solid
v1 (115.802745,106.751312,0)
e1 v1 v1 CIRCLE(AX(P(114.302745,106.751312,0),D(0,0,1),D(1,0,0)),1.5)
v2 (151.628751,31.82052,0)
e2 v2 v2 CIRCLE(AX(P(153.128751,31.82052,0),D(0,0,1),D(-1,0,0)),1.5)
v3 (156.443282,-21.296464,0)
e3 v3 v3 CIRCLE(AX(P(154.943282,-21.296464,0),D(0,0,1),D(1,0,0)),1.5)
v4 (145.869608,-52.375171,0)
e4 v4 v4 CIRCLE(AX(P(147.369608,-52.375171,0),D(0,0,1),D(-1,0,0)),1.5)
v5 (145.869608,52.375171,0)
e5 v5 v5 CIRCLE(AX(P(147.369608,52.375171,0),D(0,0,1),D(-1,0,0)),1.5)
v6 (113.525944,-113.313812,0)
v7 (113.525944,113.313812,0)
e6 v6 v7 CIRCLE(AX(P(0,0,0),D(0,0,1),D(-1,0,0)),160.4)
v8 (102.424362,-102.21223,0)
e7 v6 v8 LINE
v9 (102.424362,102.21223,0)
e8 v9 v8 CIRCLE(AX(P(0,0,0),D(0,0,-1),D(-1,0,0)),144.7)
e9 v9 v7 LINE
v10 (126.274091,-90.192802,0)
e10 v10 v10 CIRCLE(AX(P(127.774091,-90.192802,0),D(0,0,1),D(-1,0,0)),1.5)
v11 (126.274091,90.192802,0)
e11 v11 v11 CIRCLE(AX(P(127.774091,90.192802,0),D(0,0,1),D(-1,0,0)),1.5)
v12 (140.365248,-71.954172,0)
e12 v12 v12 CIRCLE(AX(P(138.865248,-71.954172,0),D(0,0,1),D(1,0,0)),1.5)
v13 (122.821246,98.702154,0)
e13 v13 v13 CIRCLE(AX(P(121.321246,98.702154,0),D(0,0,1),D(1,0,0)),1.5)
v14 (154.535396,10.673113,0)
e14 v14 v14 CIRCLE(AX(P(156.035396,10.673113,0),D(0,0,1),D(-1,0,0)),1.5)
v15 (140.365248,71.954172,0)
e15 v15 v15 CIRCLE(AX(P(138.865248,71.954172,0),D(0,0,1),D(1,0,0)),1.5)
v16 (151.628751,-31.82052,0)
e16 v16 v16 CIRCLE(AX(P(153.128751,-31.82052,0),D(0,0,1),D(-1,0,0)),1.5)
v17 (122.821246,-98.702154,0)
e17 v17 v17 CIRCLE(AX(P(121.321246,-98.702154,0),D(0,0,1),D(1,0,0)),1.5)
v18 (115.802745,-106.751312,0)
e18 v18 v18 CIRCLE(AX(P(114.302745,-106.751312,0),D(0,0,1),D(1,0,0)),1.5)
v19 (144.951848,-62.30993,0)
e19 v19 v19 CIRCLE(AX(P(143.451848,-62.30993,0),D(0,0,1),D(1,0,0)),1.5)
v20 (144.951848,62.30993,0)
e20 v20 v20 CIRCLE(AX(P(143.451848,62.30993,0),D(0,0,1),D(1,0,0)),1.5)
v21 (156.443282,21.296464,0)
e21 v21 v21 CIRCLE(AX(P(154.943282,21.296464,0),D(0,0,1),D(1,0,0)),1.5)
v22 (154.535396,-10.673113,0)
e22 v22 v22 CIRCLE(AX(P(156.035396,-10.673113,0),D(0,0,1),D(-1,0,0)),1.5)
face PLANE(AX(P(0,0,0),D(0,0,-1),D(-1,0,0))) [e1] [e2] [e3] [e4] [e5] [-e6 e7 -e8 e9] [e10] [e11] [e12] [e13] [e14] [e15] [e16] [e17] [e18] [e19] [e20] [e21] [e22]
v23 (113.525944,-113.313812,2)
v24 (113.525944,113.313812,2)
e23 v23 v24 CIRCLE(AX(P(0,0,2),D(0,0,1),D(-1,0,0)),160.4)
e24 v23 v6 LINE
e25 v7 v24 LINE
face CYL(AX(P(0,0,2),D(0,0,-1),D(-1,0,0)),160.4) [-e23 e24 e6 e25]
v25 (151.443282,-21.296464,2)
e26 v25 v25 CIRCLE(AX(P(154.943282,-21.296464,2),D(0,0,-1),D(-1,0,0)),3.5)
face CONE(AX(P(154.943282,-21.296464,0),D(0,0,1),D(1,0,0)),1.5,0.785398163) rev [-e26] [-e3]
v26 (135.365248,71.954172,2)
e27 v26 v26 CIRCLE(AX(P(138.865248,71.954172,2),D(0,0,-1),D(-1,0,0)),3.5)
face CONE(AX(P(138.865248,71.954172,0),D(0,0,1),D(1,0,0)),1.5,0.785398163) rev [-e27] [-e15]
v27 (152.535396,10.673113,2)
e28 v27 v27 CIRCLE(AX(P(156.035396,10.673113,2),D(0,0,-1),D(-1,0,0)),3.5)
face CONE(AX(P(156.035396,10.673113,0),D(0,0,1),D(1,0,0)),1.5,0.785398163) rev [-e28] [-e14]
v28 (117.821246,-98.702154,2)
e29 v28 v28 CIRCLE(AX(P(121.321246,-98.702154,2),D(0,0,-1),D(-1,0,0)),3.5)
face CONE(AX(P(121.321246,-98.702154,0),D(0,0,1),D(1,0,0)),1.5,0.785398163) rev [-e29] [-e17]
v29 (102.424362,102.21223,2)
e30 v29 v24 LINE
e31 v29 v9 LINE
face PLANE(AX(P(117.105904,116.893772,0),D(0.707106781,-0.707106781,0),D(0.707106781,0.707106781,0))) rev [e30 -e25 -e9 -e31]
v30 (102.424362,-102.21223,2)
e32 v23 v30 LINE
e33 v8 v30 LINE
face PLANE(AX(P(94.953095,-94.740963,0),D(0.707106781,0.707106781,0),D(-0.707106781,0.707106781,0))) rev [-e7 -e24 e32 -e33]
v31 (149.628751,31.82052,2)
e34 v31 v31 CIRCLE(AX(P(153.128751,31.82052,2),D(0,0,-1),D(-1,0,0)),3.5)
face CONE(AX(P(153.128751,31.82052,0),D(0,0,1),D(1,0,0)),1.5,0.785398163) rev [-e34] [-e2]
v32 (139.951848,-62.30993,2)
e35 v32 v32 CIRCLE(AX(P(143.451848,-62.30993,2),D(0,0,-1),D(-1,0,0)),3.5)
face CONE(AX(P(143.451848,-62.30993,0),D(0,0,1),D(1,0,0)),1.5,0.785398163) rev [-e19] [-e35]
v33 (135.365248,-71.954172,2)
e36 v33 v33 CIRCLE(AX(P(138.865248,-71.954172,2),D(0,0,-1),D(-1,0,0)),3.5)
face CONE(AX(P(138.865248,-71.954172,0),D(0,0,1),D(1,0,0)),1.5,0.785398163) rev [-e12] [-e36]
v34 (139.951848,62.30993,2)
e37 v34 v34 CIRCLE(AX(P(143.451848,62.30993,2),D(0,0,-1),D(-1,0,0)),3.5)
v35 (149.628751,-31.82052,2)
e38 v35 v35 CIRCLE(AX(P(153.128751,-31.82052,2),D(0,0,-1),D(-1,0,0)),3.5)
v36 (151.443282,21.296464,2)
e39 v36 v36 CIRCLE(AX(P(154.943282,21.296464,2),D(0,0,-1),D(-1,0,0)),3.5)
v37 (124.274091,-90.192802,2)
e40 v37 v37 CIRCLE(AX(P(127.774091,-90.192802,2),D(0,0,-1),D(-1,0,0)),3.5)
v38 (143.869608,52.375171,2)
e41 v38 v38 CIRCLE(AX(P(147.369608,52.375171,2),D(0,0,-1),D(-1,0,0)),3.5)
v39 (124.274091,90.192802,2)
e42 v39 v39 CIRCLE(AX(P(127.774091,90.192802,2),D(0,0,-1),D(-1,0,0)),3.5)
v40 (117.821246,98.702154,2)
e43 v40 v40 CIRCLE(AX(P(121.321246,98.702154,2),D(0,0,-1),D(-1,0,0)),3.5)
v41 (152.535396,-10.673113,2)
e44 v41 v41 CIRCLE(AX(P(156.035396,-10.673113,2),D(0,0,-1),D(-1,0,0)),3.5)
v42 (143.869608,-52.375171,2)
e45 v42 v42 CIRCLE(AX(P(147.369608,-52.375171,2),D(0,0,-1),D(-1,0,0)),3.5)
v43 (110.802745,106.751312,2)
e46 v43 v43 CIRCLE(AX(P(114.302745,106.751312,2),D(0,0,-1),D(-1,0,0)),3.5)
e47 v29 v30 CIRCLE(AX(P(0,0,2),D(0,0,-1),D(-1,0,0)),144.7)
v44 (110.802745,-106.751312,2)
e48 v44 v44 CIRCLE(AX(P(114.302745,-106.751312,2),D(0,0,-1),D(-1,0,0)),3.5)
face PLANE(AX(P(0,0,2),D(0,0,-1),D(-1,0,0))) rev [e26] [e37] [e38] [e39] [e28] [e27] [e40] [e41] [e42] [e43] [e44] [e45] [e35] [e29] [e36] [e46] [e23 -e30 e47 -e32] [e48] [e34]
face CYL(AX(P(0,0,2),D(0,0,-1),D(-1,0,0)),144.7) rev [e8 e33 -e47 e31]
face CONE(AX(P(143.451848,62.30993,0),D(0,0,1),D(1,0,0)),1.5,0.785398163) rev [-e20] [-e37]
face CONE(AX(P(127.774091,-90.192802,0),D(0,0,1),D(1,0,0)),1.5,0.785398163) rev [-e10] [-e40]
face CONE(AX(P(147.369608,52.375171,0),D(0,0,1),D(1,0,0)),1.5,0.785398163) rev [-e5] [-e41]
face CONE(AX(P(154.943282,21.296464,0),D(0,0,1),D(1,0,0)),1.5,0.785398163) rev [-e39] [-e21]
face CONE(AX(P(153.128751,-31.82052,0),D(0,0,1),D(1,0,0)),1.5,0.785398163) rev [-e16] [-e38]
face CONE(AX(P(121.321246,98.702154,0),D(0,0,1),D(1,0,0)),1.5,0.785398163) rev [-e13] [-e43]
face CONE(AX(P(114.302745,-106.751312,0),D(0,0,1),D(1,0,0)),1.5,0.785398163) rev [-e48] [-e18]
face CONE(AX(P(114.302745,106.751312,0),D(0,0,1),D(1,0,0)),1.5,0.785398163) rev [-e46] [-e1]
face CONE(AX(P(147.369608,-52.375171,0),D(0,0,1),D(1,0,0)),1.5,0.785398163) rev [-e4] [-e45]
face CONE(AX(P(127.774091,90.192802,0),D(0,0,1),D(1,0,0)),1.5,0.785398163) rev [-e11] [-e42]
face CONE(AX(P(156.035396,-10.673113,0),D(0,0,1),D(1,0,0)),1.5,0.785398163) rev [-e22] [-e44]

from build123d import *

# Parameters (mm, degrees)
SKETCH1_R           = 1.5
BOSS_EXTRUDE1_DEPTH = 2
CUT_EXTRUDE1_DEPTH  = 197.459257863
CHAMFER1_SIZE       = 2


with BuildPart() as part:
    # Sketch1 → Boss-Extrude1 (new body)
    with BuildSketch(Plane.XY):
        with BuildLine():
            Line((102.318351238, 102.318351238), (113.419927702, 113.419927702))
            ThreePointArc((113.419927702, 113.419927702), (160.4, 0), (113.419927702, -113.419927702))
            Line((113.419927702, -113.419927702), (102.318351238, -102.318351238))
            ThreePointArc((102.318351238, -102.318351238), (144.7, 0), (102.318351238, 102.318351238))
        make_face()
        with Locations((121.321245866, 98.702154493)):
            Circle(SKETCH1_R, mode=Mode.SUBTRACT)
        with Locations((143.451847555, 62.309930452)):
            Circle(SKETCH1_R, mode=Mode.SUBTRACT)
        with Locations((154.94328196, 21.296463919)):
            Circle(SKETCH1_R, mode=Mode.SUBTRACT)
        with Locations((154.94328196, -21.296463919)):
            Circle(SKETCH1_R, mode=Mode.SUBTRACT)
        with Locations((143.451847555, -62.309930452)):
            Circle(SKETCH1_R, mode=Mode.SUBTRACT)
        with Locations((121.321245866, -98.702154493)):
            Circle(SKETCH1_R, mode=Mode.SUBTRACT)
        with Locations(Location((127.774091267, 90.192802379, 0), (0, 0, 180))):
            Circle(SKETCH1_R, mode=Mode.SUBTRACT)
        with Locations(Location((147.369608219, 52.375171344, 0), (0, 0, 180))):
            Circle(SKETCH1_R, mode=Mode.SUBTRACT)
        with Locations(Location((153.128751314, 31.820520441, 0), (0, 0, 180))):
            Circle(SKETCH1_R, mode=Mode.SUBTRACT)
        with Locations(Location((156.035395501, 10.67311345, 0), (0, 0, 180))):
            Circle(SKETCH1_R, mode=Mode.SUBTRACT)
        with Locations(Location((127.774091267, -90.192802379, 0), (0, 0, 180))):
            Circle(SKETCH1_R, mode=Mode.SUBTRACT)
        with Locations(Location((147.369608219, -52.375171344, 0), (0, 0, 180))):
            Circle(SKETCH1_R, mode=Mode.SUBTRACT)
        with Locations(Location((153.128751314, -31.820520441, 0), (0, 0, 180))):
            Circle(SKETCH1_R, mode=Mode.SUBTRACT)
        with Locations(Location((156.035395501, -10.67311345, 0), (0, 0, 180))):
            Circle(SKETCH1_R, mode=Mode.SUBTRACT)
        with Locations((138.865248158, 71.954171901)):
            Circle(SKETCH1_R, mode=Mode.SUBTRACT)
        with Locations((114.302744813, 106.751311599)):
            Circle(SKETCH1_R, mode=Mode.SUBTRACT)
        with Locations((138.865248158, -71.954171901)):
            Circle(SKETCH1_R, mode=Mode.SUBTRACT)
        with Locations((114.302744813, -106.751311599)):
            Circle(SKETCH1_R, mode=Mode.SUBTRACT)
    extrude(amount=BOSS_EXTRUDE1_DEPTH)

    # Sketch2 → Cut-Extrude1 (cut, through all)
    with BuildSketch(Plane.XY.offset(2)):
        Polygon((117.10590357, 116.893771535), (92.696291985, 92.484159951), (81.614099529, 103.566352407), (106.023711114, 127.975963992), align=None)
        Polygon((94.953094668, -94.740962634), (127.588403443, -127.376271408), (106.110382849, -148.854292002), (73.475074075, -116.218983227), align=None)
    extrude(amount=-CUT_EXTRUDE1_DEPTH, mode=Mode.SUBTRACT)

    # Chamfer1
    chamfer1_edges = [part.edges().sort_by_distance(p)[0] for p in [
        (119.821245866, 98.702154493, 2),
        (141.951847555, 62.309930452, 2),
        (153.44328196, 21.296463919, 2),
        (153.44328196, -21.296463919, 2),
        (141.951847555, -62.309930452, 2),
        (119.821245866, -98.702154493, 2),
        (129.274091267, 90.192802379, 2),
        (148.869608219, 52.375171344, 2),
        (154.628751314, 31.820520441, 2),
        (157.535395501, 10.67311345, 2),
        (129.274091267, -90.192802379, 2),
        (148.869608219, -52.375171344, 2),
        (154.628751314, -31.820520441, 2),
        (157.535395501, -10.67311345, 2),
        (112.802744813, 106.751311599, 2),
        (137.365248158, 71.954171901, 2),
        (137.365248158, -71.954171901, 2),
        (112.802744813, -106.751311599, 2),
    ]]
    chamfer(chamfer1_edges, length=CHAMFER1_SIZE - 0.0001)  # a hair under: the kernel refuses the full size


solid = part.part
